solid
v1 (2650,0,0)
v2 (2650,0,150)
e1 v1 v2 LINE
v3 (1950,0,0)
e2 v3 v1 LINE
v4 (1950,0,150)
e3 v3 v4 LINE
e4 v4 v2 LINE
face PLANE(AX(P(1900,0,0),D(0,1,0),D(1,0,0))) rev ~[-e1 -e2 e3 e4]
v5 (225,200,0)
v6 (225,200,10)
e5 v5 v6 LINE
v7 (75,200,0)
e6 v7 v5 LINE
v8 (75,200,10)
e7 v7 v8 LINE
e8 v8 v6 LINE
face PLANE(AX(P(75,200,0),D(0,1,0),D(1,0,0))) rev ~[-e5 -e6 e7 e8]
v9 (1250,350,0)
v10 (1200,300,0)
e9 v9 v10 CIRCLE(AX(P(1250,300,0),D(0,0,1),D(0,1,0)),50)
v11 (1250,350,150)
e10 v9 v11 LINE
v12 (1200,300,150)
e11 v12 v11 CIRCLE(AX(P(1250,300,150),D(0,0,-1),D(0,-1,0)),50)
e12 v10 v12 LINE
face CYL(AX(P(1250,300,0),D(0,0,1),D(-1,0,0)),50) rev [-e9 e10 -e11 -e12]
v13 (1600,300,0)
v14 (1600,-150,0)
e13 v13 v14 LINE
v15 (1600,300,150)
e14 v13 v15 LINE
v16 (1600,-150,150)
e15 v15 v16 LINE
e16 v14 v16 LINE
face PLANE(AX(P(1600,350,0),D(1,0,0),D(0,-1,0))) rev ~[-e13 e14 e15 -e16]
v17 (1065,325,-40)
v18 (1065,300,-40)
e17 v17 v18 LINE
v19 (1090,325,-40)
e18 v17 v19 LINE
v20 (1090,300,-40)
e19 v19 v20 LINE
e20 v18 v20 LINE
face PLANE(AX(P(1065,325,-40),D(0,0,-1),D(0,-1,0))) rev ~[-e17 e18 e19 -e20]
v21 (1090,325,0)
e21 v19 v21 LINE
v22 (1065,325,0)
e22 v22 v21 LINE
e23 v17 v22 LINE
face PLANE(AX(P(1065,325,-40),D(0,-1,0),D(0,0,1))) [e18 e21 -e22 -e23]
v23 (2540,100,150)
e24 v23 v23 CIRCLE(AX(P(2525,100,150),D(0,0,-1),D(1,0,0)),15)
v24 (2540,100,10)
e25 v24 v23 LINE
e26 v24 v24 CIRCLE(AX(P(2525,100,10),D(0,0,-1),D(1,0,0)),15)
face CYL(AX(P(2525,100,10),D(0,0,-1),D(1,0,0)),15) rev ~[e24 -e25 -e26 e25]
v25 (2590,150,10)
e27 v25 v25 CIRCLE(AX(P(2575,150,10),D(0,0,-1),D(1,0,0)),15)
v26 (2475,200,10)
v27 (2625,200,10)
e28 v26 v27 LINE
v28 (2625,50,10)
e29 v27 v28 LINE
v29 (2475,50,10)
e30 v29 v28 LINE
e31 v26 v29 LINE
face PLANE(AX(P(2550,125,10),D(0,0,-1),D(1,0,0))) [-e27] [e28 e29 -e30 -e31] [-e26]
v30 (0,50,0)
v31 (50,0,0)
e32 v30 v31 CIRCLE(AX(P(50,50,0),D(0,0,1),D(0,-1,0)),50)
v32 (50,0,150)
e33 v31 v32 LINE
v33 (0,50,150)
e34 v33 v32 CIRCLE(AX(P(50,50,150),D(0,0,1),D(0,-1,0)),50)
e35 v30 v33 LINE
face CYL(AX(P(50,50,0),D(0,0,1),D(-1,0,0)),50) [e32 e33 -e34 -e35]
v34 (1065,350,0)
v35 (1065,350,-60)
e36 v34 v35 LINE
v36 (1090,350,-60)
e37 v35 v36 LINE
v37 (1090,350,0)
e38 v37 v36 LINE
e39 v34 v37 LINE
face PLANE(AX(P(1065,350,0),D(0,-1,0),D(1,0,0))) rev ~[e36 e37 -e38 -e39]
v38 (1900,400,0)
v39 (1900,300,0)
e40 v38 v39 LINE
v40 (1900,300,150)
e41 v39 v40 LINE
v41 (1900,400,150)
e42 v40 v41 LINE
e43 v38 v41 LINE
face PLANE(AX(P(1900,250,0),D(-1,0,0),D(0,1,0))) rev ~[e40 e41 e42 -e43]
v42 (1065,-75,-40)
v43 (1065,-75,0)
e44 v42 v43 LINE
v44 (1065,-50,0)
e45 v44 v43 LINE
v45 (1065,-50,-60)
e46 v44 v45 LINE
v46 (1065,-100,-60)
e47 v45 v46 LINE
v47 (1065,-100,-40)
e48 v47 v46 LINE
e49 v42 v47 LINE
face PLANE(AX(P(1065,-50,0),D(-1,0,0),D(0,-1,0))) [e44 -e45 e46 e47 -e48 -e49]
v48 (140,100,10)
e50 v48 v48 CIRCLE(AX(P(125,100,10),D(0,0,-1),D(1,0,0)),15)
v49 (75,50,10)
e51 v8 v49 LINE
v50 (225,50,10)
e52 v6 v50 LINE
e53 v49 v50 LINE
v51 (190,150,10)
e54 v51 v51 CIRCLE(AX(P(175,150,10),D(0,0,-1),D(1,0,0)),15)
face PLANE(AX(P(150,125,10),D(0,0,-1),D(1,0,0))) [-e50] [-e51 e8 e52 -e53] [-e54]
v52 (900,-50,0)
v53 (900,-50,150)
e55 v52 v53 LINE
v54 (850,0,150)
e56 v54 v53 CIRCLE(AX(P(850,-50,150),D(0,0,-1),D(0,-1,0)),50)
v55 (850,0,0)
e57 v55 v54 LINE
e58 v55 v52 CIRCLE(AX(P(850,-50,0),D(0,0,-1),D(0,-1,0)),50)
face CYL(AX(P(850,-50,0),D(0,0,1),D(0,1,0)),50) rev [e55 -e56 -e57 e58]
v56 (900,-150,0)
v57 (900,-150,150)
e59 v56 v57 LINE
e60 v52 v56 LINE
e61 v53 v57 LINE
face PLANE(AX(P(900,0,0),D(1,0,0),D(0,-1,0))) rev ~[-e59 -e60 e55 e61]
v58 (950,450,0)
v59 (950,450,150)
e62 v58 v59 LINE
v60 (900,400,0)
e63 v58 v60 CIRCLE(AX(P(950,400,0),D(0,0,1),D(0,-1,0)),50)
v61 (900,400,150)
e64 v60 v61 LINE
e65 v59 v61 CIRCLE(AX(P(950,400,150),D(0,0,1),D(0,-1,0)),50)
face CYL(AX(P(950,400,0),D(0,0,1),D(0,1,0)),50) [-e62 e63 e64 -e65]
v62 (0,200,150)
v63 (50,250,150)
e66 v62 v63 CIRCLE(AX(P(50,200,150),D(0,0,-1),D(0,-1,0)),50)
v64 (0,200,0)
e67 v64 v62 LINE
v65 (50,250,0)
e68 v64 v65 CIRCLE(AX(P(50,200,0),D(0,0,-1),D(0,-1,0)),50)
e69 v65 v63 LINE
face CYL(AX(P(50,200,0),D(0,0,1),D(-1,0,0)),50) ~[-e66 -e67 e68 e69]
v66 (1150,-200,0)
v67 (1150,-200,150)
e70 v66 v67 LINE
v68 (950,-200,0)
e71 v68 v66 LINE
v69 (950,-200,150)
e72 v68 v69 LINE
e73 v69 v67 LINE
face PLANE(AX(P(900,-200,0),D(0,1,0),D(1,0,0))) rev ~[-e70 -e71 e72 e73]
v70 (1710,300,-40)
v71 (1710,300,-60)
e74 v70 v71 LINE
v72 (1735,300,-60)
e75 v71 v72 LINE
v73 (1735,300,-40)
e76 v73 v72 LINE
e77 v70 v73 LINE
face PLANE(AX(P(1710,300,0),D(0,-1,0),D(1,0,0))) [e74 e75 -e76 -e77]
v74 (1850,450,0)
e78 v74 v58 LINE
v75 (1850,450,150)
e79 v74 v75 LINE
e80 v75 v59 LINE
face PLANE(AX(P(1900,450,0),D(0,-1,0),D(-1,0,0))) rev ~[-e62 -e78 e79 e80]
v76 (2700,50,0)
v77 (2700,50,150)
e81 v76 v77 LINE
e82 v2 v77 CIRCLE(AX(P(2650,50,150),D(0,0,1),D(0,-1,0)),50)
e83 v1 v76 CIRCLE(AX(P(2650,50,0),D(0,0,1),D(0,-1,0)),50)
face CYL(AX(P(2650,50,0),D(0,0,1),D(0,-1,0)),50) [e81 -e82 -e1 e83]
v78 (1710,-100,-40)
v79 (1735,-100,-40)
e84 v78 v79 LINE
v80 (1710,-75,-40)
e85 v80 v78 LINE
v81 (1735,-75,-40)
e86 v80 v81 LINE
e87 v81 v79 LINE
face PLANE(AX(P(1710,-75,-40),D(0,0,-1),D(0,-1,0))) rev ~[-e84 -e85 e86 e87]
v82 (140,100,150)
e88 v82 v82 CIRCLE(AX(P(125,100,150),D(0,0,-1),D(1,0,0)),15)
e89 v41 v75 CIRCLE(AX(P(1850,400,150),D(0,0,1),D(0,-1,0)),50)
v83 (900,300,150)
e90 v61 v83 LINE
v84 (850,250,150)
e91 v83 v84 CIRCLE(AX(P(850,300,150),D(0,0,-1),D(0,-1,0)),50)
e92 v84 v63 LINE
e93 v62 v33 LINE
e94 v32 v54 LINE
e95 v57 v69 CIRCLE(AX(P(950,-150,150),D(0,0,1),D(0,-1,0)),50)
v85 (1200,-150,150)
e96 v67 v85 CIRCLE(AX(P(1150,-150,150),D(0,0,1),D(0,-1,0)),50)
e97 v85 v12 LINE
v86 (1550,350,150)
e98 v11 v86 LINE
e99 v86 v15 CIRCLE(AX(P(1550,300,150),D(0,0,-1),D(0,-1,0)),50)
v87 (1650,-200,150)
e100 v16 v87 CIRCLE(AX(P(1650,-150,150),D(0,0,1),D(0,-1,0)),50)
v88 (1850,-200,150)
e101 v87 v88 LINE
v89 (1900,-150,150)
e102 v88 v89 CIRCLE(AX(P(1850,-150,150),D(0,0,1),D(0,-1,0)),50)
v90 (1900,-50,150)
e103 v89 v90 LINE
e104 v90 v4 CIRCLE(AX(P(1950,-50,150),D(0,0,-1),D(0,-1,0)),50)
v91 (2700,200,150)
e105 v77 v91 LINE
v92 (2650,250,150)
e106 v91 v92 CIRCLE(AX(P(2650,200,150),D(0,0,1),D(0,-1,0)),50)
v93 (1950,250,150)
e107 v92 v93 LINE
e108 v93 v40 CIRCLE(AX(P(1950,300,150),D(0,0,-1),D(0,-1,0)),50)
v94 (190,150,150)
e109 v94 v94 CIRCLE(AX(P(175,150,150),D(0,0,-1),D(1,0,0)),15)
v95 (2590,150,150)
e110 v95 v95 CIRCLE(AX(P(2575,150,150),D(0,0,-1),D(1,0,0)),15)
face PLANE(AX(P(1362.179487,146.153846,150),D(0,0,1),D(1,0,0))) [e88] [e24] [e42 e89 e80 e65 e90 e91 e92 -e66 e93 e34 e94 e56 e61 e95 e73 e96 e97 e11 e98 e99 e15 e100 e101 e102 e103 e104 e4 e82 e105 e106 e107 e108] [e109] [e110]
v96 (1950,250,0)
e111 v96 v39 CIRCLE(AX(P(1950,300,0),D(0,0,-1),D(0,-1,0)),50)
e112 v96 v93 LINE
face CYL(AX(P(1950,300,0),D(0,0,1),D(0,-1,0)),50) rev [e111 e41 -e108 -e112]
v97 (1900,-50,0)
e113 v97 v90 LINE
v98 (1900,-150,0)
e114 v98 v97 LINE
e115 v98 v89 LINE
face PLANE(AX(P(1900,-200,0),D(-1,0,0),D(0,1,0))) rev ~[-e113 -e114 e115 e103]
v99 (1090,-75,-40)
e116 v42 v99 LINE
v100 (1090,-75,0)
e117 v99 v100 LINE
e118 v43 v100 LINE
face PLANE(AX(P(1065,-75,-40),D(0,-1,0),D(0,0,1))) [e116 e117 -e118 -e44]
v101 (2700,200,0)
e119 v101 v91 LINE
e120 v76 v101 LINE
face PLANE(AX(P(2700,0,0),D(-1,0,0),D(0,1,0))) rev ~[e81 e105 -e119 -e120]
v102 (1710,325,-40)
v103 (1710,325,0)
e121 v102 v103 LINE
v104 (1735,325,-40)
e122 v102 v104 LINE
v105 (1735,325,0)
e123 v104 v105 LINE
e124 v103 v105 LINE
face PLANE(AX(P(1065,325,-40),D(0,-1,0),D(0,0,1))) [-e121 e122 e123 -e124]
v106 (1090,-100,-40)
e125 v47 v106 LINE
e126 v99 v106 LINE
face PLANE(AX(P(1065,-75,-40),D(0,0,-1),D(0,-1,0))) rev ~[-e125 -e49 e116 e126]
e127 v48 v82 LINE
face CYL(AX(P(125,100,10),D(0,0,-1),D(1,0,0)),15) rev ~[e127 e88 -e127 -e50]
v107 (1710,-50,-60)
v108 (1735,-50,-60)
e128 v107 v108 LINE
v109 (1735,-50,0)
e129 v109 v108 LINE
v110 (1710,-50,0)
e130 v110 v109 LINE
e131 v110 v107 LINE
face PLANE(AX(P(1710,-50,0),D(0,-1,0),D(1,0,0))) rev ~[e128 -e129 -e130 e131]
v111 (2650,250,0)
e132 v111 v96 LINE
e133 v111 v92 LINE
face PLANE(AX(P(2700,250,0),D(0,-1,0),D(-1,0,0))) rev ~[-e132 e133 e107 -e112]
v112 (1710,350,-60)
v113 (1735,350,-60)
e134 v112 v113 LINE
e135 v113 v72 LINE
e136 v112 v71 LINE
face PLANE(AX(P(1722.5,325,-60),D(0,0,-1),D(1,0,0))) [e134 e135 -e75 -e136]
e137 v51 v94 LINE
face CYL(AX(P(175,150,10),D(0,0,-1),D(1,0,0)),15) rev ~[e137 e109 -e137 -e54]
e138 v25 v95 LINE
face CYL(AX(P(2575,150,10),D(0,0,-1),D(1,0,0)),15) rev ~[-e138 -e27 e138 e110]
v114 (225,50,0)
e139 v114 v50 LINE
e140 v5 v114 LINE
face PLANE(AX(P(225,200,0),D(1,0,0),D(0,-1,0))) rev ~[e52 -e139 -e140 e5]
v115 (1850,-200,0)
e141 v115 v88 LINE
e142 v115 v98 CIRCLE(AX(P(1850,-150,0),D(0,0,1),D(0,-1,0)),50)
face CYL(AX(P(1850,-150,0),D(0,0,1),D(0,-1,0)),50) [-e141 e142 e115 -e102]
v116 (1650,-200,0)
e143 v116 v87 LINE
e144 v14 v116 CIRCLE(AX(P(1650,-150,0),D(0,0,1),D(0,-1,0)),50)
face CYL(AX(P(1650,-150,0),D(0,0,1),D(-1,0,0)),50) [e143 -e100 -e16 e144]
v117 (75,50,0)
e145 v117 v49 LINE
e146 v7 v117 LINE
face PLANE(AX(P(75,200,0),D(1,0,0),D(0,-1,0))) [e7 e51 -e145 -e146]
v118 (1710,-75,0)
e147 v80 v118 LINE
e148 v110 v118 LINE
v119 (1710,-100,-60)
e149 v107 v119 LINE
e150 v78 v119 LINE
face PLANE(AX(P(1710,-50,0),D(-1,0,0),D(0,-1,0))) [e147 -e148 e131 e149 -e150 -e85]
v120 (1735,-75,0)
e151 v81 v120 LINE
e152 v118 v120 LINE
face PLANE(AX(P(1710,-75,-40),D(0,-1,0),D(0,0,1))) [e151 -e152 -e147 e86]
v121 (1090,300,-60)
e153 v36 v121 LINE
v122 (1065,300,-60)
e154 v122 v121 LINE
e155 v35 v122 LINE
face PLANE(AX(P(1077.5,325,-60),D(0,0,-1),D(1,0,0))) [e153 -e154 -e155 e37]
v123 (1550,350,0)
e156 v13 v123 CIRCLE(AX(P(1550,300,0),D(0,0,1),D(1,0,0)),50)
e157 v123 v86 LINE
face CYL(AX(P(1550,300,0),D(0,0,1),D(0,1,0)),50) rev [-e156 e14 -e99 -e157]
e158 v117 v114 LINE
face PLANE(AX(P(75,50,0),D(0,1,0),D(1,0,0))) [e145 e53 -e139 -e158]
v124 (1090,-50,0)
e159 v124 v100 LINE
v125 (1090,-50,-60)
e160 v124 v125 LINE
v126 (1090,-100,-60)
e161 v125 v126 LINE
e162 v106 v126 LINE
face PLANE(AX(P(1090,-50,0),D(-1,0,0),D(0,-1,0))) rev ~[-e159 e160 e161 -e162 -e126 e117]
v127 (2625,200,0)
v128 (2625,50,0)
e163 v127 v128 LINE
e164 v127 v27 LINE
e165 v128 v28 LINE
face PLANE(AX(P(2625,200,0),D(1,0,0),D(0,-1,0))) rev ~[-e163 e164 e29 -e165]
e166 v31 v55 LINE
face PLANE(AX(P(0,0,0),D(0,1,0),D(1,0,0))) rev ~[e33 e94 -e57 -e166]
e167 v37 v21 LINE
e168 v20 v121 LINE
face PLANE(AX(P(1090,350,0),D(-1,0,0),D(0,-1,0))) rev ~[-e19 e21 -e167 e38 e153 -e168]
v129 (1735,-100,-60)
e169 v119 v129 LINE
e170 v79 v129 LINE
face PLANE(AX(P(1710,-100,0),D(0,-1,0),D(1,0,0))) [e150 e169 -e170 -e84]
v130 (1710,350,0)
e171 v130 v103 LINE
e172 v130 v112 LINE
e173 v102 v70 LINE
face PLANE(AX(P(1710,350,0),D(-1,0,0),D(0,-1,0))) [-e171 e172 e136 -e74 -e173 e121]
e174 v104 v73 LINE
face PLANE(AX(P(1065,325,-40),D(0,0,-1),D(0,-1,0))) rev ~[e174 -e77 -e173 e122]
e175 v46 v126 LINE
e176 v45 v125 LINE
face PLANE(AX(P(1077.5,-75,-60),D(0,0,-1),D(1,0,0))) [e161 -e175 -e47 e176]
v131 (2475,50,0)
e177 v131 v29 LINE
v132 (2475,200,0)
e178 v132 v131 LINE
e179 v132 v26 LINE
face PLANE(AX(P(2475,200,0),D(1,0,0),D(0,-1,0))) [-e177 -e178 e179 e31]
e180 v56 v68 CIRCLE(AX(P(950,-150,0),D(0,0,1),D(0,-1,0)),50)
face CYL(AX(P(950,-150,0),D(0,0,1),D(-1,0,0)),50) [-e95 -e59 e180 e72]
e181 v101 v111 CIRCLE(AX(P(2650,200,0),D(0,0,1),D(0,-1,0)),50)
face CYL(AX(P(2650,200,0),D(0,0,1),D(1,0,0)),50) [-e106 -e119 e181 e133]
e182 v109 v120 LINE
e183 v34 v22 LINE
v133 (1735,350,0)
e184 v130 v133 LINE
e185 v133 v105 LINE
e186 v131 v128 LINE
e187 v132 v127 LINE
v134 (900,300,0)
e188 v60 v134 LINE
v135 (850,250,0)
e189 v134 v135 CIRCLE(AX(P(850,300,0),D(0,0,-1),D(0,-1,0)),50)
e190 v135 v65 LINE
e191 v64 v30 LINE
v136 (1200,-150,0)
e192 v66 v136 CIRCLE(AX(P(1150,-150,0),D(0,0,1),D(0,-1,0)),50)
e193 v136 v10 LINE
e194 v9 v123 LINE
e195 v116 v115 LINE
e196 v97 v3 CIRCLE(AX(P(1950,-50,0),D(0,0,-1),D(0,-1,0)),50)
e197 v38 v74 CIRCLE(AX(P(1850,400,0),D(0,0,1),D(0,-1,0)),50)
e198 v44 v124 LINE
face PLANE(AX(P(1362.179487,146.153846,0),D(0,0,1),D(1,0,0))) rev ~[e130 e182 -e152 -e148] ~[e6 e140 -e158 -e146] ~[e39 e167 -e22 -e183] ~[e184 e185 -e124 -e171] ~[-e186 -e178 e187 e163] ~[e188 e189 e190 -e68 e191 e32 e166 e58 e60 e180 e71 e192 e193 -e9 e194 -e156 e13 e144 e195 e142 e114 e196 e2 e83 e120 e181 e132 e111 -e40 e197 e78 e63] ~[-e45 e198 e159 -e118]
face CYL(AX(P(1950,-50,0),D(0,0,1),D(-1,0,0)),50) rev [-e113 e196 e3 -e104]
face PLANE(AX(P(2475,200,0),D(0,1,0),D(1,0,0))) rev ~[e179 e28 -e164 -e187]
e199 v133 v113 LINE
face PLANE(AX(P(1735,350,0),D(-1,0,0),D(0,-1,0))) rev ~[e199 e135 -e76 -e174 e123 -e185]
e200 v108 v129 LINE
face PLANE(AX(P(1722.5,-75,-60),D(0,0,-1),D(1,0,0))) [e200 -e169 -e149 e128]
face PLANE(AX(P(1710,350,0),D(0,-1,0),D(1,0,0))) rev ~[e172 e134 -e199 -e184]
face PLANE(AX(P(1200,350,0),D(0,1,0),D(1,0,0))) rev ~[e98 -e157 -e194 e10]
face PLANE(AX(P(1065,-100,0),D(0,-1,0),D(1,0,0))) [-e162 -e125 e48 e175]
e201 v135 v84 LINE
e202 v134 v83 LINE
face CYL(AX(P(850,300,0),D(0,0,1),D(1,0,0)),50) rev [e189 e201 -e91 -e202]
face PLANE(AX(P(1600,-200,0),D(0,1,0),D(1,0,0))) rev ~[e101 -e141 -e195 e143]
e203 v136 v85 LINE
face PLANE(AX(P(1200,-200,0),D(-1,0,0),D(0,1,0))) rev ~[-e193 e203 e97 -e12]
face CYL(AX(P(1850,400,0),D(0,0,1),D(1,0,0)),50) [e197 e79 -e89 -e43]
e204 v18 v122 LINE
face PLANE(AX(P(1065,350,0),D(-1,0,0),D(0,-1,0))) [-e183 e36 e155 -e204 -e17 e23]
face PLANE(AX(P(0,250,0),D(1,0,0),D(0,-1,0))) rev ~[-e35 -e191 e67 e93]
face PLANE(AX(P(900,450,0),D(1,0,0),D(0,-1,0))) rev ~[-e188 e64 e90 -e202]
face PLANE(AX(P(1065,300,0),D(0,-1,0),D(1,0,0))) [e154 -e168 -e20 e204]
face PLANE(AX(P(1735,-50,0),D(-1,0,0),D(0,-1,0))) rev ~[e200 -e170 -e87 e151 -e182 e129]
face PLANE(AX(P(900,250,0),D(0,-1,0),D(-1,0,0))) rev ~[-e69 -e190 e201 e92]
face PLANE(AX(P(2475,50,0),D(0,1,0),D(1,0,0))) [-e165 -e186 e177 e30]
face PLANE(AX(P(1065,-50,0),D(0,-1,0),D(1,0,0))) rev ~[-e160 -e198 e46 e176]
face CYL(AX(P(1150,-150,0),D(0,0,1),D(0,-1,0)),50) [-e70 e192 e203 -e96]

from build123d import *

# Parameters (mm, degrees)
F1_DEPTH  = 150
F2_R      = 50
F3_W      = 150
F3_H      = 150
F4_DEPTH  = 10
F6_R      = 15
F7_DEPTH  = 200
F8_R      = 15
F9_DEPTH  = 200
F10_W     = 25
F10_H     = 50
F11_DEPTH = 60
F12_W     = 25
F12_H     = 40
F13_DEPTH = 100
F14_W     = 25
F14_H     = 40
F15_DEPTH = 100
F16_W     = 25
F16_H     = 40
F17_DEPTH = 1000


# Not quite as in the source:
# - two fillets or chamfers of one size are made in one step
# - a feature names something its author has since deleted; it is built from what else it names


with BuildPart() as f1:
    # F0 (on Top) → F1 (new body)
    with BuildSketch(Plane.XY):
        Polygon((0, 250), (0, 0), (900, 0), (900, -200), (1200, -200), (1200, 350), (1600, 350), (1600, -200), (1900, -200), (1900, 0), (2700, 0), (2700, 250), (1900, 250), (1900, 450), (900, 450), (900, 250), align=None)
    extrude(amount=F1_DEPTH)

    # F2
    f2_edges = [f1.edges().sort_by_distance(p)[0] for p in [
        (1600, 350, 75),
        (1600, -200, 75),
        (1900, -200, 75),
        (1900, 450, 75),
        (900, 450, 75),
        (900, 250, 75),
        (0, 250, 75),
        (0, 0, 75),
        (900, 0, 75),
        (900, -200, 75),
        (1200, -200, 75),
        (1200, 350, 75),
        (1900, 0, 75),
        (2700, 0, 75),
        (2700, 250, 75),
        (1900, 250, 75),
    ]]
    fillet(f2_edges, radius=F2_R)

    # F3 (on face) → F4 (cut)
    with BuildSketch(Plane(origin=(0, 0, 0), x_dir=(1, 0, 0), z_dir=(0, 0, -1))):
        with Locations((150, -125)):
            Rectangle(F3_W, F3_H)
        with Locations((2550, -125)):
            Rectangle(F3_W, F3_H)
    extrude(amount=-F4_DEPTH, mode=Mode.SUBTRACT)

    # F6 (on face) → F7 (cut)
    with BuildSketch(Plane(origin=(0, 0, 10), x_dir=(1, 0, 0), z_dir=(0, 0, -1))):
        with Locations((175, -150)):
            Circle(F6_R)
        with Locations((125, -100)):
            Circle(F6_R)
    extrude(amount=-F7_DEPTH, mode=Mode.SUBTRACT)

    # F8 (on face) → F9 (cut)
    with BuildSketch(Plane(origin=(0, 0, 10), x_dir=(1, 0, 0), z_dir=(0, 0, -1))):
        with Locations((2525, -100)):
            Circle(F8_R)
        with Locations((2575, -150)):
            Circle(F8_R)
    extrude(amount=-F9_DEPTH, mode=Mode.SUBTRACT)

    # F10 (on face) → F11 (join)
    with BuildSketch(Plane(origin=(0, 0, 0), x_dir=(1, 0, 0), z_dir=(0, 0, -1))):
        with Locations((1077.5, 75)):
            Rectangle(F10_W, F10_H)
        with Locations((1722.5, 75)):
            Rectangle(F10_W, F10_H)
        with Locations((1077.5, -325)):
            Rectangle(F10_W, F10_H)
        with Locations((1722.5, -325)):
            Rectangle(F10_W, F10_H)
    extrude(amount=F11_DEPTH)

    # F12 (on face) → F13 (cut)
    with BuildSketch(Plane(origin=(1065, 0, 0), x_dir=(0, -1, 0), z_dir=(-1, 0, 0))):
        with Locations((87.5, -20)):
            Rectangle(F12_W, F12_H)
    extrude(amount=-F13_DEPTH, mode=Mode.SUBTRACT)

    # F14 (on face) → F15 (cut)
    with BuildSketch(Plane(origin=(1710, 0, 0), x_dir=(0, -1, 0), z_dir=(-1, 0, 0))):
        with Locations((87.5, -20)):
            Rectangle(F14_W, F14_H)
    extrude(amount=-F15_DEPTH, mode=Mode.SUBTRACT)

    # F16 (on face) → F17 (cut)
    with BuildSketch(Plane(origin=(1065, 0, 0), x_dir=(0, -1, 0), z_dir=(-1, 0, 0))):
        with Locations((-312.5, -20)):
            Rectangle(F16_W, F16_H)
    extrude(amount=-F17_DEPTH, mode=Mode.SUBTRACT)


solid = f1.part
